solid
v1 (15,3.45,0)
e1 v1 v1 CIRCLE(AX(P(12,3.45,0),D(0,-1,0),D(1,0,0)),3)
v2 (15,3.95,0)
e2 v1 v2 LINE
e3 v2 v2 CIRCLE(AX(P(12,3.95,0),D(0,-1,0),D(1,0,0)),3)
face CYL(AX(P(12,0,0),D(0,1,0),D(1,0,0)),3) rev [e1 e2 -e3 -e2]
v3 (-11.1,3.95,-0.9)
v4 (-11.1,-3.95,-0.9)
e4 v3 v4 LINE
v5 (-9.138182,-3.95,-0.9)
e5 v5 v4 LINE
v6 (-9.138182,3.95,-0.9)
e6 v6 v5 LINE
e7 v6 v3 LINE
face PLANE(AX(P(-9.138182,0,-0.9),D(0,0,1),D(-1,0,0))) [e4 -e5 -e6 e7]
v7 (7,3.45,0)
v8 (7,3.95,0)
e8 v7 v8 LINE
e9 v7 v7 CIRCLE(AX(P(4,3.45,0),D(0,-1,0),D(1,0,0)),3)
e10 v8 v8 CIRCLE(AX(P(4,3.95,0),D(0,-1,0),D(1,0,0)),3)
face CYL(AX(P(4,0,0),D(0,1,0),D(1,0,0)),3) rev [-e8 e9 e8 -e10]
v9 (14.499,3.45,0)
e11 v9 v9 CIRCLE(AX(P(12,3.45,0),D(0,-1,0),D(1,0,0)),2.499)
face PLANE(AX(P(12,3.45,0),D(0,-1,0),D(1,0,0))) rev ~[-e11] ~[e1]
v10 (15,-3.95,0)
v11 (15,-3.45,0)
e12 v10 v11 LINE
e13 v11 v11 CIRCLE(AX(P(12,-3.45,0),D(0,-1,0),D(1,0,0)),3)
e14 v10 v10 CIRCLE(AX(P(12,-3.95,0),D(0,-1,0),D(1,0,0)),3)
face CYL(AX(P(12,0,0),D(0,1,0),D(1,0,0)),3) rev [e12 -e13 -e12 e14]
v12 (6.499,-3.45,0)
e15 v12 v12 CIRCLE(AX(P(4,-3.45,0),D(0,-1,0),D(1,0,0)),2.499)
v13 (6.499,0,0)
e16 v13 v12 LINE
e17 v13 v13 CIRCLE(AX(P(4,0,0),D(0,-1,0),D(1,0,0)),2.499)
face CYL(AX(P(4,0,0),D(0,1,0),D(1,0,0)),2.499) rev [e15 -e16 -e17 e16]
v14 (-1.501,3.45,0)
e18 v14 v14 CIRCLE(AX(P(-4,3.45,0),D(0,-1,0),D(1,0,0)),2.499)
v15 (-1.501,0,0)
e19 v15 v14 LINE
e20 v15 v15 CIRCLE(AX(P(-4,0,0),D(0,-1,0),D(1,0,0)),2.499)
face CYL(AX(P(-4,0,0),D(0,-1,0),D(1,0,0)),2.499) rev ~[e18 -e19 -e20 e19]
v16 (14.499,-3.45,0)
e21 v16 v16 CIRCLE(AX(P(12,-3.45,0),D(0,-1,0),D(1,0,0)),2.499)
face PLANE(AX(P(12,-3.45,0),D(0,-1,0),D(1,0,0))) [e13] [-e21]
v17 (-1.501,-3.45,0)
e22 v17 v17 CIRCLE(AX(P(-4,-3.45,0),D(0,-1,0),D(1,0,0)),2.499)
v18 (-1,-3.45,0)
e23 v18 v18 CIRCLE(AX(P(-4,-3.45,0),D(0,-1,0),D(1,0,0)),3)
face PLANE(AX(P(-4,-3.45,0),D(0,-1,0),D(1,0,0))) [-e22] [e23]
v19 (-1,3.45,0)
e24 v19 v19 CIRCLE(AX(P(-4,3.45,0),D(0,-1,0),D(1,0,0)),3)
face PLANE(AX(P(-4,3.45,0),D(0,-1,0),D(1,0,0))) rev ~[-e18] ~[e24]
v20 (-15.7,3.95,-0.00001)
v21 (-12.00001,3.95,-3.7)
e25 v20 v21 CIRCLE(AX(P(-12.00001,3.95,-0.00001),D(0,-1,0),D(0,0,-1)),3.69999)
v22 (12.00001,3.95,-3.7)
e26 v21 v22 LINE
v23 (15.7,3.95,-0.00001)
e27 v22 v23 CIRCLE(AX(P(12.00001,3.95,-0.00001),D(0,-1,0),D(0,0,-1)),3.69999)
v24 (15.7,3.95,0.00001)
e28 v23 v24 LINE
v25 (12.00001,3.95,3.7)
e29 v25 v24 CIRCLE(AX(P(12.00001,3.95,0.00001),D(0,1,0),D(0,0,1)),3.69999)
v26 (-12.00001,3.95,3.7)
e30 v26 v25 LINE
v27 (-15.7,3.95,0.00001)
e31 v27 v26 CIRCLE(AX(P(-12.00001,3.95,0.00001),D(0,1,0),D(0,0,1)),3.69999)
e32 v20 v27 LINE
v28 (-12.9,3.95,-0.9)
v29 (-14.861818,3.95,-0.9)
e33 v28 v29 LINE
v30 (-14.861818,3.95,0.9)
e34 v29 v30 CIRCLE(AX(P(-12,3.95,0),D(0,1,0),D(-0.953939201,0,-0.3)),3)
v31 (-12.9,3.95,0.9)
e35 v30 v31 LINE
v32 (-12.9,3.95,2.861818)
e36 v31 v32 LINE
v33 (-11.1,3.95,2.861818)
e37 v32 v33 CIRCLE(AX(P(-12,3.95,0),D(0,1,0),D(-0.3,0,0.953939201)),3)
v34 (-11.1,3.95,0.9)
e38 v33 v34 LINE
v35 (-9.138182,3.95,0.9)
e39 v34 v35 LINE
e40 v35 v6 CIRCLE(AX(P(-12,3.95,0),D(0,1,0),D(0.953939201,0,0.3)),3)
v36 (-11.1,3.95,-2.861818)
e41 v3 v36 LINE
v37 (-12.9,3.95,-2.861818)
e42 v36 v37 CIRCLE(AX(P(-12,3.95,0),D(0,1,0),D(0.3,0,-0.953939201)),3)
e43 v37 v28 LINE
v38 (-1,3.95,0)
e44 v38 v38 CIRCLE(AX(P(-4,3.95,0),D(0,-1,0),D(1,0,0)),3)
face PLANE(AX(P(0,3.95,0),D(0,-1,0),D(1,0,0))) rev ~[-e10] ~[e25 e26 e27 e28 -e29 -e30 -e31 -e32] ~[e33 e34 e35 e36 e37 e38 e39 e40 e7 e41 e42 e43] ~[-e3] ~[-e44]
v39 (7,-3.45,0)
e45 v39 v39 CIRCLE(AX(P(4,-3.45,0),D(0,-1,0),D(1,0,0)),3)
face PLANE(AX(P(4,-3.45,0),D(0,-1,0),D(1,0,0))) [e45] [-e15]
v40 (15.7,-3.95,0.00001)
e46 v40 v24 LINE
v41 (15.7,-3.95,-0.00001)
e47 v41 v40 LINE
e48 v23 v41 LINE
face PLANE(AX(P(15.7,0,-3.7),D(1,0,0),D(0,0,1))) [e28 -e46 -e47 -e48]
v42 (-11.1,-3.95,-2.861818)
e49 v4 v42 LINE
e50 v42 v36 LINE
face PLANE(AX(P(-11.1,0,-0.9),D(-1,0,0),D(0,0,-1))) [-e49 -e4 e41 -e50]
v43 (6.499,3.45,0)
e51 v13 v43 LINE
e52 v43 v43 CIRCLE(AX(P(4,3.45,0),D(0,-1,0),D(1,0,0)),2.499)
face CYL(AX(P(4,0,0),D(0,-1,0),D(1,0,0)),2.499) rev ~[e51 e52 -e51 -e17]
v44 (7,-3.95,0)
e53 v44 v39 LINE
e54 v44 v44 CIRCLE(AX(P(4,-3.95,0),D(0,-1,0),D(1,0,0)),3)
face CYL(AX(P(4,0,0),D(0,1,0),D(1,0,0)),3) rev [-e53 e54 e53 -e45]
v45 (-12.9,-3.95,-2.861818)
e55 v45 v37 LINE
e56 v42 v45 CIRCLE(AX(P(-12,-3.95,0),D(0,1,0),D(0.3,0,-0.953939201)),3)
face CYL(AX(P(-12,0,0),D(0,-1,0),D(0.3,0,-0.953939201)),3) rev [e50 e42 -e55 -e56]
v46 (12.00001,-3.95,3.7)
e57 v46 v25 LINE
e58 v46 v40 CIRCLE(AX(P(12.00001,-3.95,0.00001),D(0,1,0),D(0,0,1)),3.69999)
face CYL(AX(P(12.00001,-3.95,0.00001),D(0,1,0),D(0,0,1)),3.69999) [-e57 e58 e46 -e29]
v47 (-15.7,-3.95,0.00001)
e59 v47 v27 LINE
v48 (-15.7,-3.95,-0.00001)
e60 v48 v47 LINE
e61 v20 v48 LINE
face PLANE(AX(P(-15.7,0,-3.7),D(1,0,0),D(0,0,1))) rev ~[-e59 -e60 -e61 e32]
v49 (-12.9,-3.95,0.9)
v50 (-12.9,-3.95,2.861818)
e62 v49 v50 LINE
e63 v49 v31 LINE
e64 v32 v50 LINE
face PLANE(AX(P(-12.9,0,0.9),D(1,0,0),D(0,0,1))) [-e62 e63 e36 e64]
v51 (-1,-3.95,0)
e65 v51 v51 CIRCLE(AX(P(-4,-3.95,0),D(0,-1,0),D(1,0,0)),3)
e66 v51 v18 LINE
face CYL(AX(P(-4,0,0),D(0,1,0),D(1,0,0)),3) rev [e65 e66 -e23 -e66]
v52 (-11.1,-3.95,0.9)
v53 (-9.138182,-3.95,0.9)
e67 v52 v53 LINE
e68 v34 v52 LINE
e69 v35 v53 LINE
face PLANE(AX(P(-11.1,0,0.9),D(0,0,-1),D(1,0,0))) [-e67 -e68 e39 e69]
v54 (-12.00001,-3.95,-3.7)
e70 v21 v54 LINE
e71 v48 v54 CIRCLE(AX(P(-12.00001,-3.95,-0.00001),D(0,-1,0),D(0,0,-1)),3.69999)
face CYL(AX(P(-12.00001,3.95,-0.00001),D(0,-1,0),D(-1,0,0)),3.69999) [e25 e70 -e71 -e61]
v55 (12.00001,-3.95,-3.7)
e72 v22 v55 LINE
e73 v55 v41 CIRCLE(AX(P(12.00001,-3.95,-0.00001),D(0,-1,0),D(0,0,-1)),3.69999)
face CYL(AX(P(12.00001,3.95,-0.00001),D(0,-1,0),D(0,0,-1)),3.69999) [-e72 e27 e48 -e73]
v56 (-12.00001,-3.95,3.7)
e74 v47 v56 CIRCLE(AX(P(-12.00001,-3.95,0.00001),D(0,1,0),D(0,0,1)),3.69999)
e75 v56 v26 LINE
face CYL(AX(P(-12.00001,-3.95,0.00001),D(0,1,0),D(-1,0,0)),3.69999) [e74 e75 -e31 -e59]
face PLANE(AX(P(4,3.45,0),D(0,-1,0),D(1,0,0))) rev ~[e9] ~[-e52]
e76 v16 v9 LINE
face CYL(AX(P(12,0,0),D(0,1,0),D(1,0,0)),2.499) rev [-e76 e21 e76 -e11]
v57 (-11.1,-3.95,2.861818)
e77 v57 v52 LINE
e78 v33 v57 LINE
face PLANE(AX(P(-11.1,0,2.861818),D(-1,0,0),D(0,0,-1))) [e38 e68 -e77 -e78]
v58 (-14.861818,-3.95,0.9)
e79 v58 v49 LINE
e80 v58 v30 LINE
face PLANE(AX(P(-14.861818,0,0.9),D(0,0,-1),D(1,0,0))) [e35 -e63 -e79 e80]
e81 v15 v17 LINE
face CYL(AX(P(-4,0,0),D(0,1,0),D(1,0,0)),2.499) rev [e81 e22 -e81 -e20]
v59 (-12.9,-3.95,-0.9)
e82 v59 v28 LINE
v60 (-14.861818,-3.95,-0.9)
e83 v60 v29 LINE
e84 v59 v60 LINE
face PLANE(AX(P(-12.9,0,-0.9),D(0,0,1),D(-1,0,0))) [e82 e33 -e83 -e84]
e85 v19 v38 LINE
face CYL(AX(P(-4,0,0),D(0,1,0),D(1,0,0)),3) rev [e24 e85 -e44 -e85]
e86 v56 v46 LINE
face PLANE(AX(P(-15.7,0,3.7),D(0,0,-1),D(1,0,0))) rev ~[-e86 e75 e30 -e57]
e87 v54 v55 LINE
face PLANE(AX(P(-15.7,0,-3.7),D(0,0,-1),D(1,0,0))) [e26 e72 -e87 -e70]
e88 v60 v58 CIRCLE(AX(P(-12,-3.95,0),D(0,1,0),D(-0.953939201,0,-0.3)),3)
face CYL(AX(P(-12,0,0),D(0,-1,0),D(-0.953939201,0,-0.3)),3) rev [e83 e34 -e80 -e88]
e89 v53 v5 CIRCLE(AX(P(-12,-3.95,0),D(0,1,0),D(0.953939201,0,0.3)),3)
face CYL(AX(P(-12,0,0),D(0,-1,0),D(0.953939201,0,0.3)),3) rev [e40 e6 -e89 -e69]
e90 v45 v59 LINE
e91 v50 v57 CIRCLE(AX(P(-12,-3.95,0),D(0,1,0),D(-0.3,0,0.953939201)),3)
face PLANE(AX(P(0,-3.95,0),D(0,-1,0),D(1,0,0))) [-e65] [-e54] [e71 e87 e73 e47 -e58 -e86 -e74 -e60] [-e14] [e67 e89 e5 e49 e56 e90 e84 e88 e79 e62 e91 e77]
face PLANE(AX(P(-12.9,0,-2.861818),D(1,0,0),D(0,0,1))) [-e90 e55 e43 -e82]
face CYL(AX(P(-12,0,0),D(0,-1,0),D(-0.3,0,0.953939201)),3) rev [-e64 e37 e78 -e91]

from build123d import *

# Parameters (mm, degrees)
F0_W     = 31.4
F0_H     = 7.4
F0_R     = 3
F1_DEPTH = 3.95
F0_R_2   = 2.499
F2_DEPTH = 3.45
F3_R     = 3.69999


# Not quite as in the source:
# - a fillet or chamfer is up to 0.001 mm smaller than in the source, because OpenCascade refuses the exact size


with BuildPart() as f1:
    # F0 (on Front) → F1 (new body, symmetric)
    with BuildSketch(Plane.XZ):
        Rectangle(F0_W, F0_H)
        with BuildLine():
            ThreePointArc((-12.9, 2.8618176043), (-12, 3), (-11.1, 2.8618176043))
            Line((-11.1, 2.8618176043), (-11.1, 0.9))
            Line((-11.1, 0.9), (-9.1381823957, 0.9))
            ThreePointArc((-9.1381823957, 0.9), (-9, 0), (-9.1381823957, -0.9))
            Line((-9.1381823957, -0.9), (-11.1, -0.9))
            Line((-11.1, -0.9), (-11.1, -2.8618176043))
            ThreePointArc((-11.1, -2.8618176043), (-12, -3), (-12.9, -2.8618176043))
            Line((-12.9, -2.8618176043), (-12.9, -0.9))
            Line((-12.9, -0.9), (-14.8618176043, -0.9))
            ThreePointArc((-14.8618176043, -0.9), (-15, 0), (-14.8618176043, 0.9))
            Line((-14.8618176043, 0.9), (-12.9, 0.9))
            Line((-12.9, 0.9), (-12.9, 2.8618176043))
        make_face(mode=Mode.SUBTRACT)
        with Locations((-4, 0)):
            Circle(F0_R, mode=Mode.SUBTRACT)
        with Locations((4, 0)):
            Circle(F0_R, mode=Mode.SUBTRACT)
        with Locations((12, 0)):
            Circle(F0_R, mode=Mode.SUBTRACT)
    extrude(amount=F1_DEPTH, both=True)

    # F0 (on Front) → F2 (join, symmetric)
    with BuildSketch(Plane.XZ):
        with Locations((-4, 0)):
            Circle(F0_R)
        with Locations((-4, 0)):
            Circle(F0_R_2, mode=Mode.SUBTRACT)
        with Locations((4, 0)):
            Circle(F0_R)
        with Locations((4, 0)):
            Circle(F0_R_2, mode=Mode.SUBTRACT)
        with Locations((12, 0)):
            Circle(F0_R)
        with Locations((12, 0)):
            Circle(F0_R_2, mode=Mode.SUBTRACT)
    extrude(amount=F2_DEPTH, both=True)

    # F3 (radius 3.7 in the source; OpenCascade refuses exactly that, so slightly less here)
    f3_edges = [f1.edges().sort_by_distance(p)[0] for p in [
        (-15.7, 0, 3.7),
        (-15.7, 0, -3.7),
        (15.7, 0, 3.7),
        (15.7, 0, -3.7),
    ]]
    fillet(f3_edges, radius=F3_R)


solid = f1.part
